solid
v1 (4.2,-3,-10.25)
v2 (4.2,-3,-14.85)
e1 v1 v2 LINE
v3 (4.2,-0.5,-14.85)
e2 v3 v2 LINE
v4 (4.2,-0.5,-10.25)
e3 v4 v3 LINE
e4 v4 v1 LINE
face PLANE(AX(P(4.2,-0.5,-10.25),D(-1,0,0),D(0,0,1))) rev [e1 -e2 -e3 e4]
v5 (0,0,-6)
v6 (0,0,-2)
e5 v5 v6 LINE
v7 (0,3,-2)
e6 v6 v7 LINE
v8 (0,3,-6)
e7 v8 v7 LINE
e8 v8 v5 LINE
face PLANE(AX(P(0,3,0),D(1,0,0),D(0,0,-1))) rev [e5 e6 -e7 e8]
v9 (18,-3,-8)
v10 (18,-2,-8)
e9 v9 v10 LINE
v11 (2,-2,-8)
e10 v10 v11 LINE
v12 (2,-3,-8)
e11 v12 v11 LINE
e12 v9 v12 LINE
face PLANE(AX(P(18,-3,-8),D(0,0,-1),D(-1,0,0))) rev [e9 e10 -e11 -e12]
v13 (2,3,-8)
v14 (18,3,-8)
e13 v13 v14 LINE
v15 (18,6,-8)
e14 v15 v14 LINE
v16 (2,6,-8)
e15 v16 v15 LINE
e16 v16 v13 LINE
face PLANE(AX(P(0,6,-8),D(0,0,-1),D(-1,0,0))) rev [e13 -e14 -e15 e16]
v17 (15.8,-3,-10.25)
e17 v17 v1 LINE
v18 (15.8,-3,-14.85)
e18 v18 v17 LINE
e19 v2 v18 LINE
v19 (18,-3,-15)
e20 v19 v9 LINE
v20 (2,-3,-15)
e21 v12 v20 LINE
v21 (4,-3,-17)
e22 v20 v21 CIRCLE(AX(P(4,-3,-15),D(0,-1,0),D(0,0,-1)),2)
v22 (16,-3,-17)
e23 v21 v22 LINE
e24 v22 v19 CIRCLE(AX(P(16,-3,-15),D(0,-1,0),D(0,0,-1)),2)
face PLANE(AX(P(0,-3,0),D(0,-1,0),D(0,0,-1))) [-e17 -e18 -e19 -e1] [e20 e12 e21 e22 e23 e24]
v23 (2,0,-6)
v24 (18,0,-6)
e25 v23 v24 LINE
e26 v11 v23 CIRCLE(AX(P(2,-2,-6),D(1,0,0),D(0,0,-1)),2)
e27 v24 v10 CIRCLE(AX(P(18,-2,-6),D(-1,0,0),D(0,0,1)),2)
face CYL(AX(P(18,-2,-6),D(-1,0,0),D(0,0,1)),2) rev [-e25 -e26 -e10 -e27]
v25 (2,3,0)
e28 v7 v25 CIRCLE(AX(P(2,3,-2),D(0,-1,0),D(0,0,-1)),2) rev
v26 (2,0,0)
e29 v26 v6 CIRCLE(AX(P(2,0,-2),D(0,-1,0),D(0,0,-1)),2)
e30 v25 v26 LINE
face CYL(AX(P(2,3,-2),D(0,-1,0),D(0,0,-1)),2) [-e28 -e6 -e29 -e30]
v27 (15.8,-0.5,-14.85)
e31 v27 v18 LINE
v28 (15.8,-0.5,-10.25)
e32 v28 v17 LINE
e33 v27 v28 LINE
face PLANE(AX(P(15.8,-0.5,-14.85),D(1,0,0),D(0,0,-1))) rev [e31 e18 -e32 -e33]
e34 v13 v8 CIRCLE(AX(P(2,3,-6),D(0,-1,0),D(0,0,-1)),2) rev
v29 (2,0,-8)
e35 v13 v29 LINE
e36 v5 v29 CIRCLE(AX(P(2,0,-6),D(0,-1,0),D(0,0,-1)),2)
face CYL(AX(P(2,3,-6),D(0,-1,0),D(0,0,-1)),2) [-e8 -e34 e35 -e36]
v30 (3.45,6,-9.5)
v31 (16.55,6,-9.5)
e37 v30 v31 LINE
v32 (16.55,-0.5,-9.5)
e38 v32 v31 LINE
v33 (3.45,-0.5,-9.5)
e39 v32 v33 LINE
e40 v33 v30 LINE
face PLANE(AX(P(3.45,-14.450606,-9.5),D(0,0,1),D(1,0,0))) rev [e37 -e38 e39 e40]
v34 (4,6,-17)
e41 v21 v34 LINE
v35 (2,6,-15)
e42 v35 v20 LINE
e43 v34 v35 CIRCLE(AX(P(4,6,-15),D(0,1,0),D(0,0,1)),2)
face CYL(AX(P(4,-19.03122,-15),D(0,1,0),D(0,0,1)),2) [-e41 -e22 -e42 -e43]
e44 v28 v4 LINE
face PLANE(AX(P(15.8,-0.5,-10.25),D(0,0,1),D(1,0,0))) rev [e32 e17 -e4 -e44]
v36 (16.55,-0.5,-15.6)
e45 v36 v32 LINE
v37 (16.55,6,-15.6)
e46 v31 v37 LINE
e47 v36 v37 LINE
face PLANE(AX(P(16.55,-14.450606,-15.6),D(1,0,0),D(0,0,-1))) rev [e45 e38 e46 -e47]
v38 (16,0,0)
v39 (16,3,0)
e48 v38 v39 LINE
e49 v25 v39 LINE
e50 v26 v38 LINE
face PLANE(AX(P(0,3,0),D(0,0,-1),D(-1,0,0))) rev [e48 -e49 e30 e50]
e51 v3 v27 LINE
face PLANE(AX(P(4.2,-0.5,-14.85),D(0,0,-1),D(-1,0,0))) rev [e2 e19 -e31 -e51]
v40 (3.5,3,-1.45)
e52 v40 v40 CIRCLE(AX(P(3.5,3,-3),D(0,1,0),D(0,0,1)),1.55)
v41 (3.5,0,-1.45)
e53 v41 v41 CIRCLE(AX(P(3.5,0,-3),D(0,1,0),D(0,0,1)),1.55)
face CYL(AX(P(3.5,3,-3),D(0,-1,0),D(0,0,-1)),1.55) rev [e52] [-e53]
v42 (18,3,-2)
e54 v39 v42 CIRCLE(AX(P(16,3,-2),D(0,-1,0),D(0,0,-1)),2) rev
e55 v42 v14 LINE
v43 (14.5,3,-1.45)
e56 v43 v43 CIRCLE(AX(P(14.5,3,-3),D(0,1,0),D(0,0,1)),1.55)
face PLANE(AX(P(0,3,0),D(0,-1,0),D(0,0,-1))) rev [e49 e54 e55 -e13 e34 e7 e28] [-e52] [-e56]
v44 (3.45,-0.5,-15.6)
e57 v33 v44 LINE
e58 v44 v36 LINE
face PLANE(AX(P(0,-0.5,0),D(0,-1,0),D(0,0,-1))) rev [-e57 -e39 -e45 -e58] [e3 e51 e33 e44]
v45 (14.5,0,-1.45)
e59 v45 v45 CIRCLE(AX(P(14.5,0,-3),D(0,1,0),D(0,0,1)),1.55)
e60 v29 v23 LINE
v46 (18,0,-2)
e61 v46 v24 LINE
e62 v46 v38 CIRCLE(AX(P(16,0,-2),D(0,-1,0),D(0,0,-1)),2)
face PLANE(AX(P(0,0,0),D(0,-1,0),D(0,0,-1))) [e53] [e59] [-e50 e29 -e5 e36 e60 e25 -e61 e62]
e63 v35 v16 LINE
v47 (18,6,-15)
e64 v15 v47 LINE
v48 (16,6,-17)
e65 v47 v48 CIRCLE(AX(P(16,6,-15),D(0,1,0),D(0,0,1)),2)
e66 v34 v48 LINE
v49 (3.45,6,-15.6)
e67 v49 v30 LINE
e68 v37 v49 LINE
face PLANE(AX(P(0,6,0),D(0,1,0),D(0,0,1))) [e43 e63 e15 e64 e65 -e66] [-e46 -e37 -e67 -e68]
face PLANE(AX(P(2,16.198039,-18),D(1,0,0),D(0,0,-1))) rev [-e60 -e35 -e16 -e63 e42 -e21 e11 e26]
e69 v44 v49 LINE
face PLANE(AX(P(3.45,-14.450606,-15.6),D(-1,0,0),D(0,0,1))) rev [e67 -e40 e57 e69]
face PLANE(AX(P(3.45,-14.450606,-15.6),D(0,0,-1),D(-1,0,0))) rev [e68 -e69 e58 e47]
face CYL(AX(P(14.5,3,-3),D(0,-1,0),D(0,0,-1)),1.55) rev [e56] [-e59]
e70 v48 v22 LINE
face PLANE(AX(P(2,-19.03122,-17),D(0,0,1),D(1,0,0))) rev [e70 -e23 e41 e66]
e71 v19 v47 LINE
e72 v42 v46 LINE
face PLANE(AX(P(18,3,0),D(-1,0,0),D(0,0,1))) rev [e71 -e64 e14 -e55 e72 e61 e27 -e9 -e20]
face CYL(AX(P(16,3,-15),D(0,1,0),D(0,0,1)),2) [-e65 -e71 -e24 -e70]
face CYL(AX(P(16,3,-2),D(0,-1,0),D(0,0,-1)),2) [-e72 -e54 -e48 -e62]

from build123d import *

# Parameters (mm, degrees)
CROQUIS1_W              = 18
CROQUIS1_H              = 18
CROQUIS1_R              = 1.55
SALIENTE_EXTRUIR1_DEPTH = 3
CROQUIS3_W              = 18
CROQUIS3_H              = 10
SALIENTE_EXTRUIR3_DEPTH = 3
CORTAR_EXTRUIR1_REACH   = 28.153
CROQUIS4_W              = 2
CROQUIS4_H              = 10
CROQUIS7_W              = 13.1
CROQUIS7_H              = 6.1
CORTAR_EXTRUIR2_DEPTH   = 6
CROQUIS9_W              = 16
CROQUIS9_H              = 10
CROQUIS9_W_2            = 13.1
CROQUIS9_H_2            = 6.1
SALIENTE_EXTRUIR4_DEPTH = 3
CROQUIS10_W             = 13.1
CROQUIS10_H             = 6.1
CROQUIS10_W_2           = 11.6
CROQUIS10_H_2           = 4.6
SALIENTE_EXTRUIR6_DEPTH = 2.5
CROQUIS11_W             = 16
CROQUIS11_H             = 1
CORTAR_EXTRUIR4_DEPTH   = 9
REDONDEO1_R             = 2


with BuildPart() as part:
    # Croquis1 → Saliente-Extruir1 (new body)
    with BuildSketch(Plane(origin=(0, 0, 0), x_dir=(1, 0, 0), z_dir=(0, 1, 0))):
        with Locations((9, 9)):
            Rectangle(CROQUIS1_W, CROQUIS1_H)
        with Locations(Location((3.5, 3, 0), (0, 0, 270))):
            Circle(CROQUIS1_R, mode=Mode.SUBTRACT)
        with Locations(Location((14.5, 3, 0), (0, 0, 270))):
            Circle(CROQUIS1_R, mode=Mode.SUBTRACT)
    extrude(amount=SALIENTE_EXTRUIR1_DEPTH)

    # Croquis3 → Saliente-Extruir3 (add)
    with BuildSketch(Plane(origin=(0, 3, 0), x_dir=(1, 0, 0), z_dir=(0, 1, 0))):
        with Locations((9, 13)):
            Rectangle(CROQUIS3_W, CROQUIS3_H)
    extrude(amount=SALIENTE_EXTRUIR3_DEPTH)

    # Cortar-Extruir1: up to this face of the body (flat: up to its plane)
    cortar_extruir1_end = Plane(part.part.faces().sort_by_distance((9, 6, -13))[0])
    # Croquis4 → Cortar-Extruir1 (cut, up to the picked face)
    with BuildSketch(Plane.XZ, mode=Mode.PRIVATE) as cortar_extruir1_sk1:
        with Locations((1, -13)):
            Rectangle(CROQUIS4_W, CROQUIS4_H)
    cortar_extruir1_tool1 = split(extrude(cortar_extruir1_sk1.sketch, amount=-CORTAR_EXTRUIR1_REACH, mode=Mode.PRIVATE), bisect_by=cortar_extruir1_end, keep=Keep.BOTH, mode=Mode.PRIVATE)
    add(cortar_extruir1_tool1.solids().sort_by(Axis((1, 0, -13), (0, 1, 0)))[0], mode=Mode.SUBTRACT)

    # Croquis7 → Cortar-Extruir2 (cut)
    with BuildSketch(Plane(origin=(0, 6, 0), x_dir=(1, 0, 0), z_dir=(0, 1, 0))):
        with Locations((10, 12.55)):
            Rectangle(CROQUIS7_W, CROQUIS7_H)
    extrude(amount=-CORTAR_EXTRUIR2_DEPTH, mode=Mode.SUBTRACT)

    # Croquis9 → Saliente-Extruir4 (add)
    with BuildSketch(Plane.XZ):
        with Locations((10, -13)):
            Rectangle(CROQUIS9_W, CROQUIS9_H)
        with Locations((10, -12.55)):
            Rectangle(CROQUIS9_W_2, CROQUIS9_H_2, mode=Mode.SUBTRACT)
    extrude(amount=SALIENTE_EXTRUIR4_DEPTH)

    # Croquis10 → Saliente-Extruir6 (add)
    with BuildSketch(Plane.XZ.offset(3)):
        with Locations((10, -12.55)):
            Rectangle(CROQUIS10_W, CROQUIS10_H)
        with Locations((10, -12.55)):
            Rectangle(CROQUIS10_W_2, CROQUIS10_H_2, mode=Mode.SUBTRACT)
    extrude(amount=-SALIENTE_EXTRUIR6_DEPTH)

    # Croquis11 → Cortar-Extruir4 (cut)
    with BuildSketch(Plane(origin=(0, 6, 0), x_dir=(1, 0, 0), z_dir=(0, 1, 0))):
        with Locations((10, 17.5)):
            Rectangle(CROQUIS11_W, CROQUIS11_H)
    extrude(amount=-CORTAR_EXTRUIR4_DEPTH, mode=Mode.SUBTRACT)

    # Redondeo1
    redondeo1_edges = [part.edges().sort_by_distance(p)[0] for p in [
        (10, 0, -8),
    ]]
    fillet(redondeo1_edges, radius=REDONDEO1_R)
    redondeo1_2_edges = [part.edges().sort_by_distance(p)[0] for p in [
        (18, 1.5, -17),
        (2, 1.5, -17),
        (0, 1.5, -8),
        (18, 1.5, 0),
        (0, 1.5, 0),
    ]]
    fillet(redondeo1_2_edges, radius=REDONDEO1_R - 0.0001)  # a hair under: the kernel refuses the full size


solid = part.part
